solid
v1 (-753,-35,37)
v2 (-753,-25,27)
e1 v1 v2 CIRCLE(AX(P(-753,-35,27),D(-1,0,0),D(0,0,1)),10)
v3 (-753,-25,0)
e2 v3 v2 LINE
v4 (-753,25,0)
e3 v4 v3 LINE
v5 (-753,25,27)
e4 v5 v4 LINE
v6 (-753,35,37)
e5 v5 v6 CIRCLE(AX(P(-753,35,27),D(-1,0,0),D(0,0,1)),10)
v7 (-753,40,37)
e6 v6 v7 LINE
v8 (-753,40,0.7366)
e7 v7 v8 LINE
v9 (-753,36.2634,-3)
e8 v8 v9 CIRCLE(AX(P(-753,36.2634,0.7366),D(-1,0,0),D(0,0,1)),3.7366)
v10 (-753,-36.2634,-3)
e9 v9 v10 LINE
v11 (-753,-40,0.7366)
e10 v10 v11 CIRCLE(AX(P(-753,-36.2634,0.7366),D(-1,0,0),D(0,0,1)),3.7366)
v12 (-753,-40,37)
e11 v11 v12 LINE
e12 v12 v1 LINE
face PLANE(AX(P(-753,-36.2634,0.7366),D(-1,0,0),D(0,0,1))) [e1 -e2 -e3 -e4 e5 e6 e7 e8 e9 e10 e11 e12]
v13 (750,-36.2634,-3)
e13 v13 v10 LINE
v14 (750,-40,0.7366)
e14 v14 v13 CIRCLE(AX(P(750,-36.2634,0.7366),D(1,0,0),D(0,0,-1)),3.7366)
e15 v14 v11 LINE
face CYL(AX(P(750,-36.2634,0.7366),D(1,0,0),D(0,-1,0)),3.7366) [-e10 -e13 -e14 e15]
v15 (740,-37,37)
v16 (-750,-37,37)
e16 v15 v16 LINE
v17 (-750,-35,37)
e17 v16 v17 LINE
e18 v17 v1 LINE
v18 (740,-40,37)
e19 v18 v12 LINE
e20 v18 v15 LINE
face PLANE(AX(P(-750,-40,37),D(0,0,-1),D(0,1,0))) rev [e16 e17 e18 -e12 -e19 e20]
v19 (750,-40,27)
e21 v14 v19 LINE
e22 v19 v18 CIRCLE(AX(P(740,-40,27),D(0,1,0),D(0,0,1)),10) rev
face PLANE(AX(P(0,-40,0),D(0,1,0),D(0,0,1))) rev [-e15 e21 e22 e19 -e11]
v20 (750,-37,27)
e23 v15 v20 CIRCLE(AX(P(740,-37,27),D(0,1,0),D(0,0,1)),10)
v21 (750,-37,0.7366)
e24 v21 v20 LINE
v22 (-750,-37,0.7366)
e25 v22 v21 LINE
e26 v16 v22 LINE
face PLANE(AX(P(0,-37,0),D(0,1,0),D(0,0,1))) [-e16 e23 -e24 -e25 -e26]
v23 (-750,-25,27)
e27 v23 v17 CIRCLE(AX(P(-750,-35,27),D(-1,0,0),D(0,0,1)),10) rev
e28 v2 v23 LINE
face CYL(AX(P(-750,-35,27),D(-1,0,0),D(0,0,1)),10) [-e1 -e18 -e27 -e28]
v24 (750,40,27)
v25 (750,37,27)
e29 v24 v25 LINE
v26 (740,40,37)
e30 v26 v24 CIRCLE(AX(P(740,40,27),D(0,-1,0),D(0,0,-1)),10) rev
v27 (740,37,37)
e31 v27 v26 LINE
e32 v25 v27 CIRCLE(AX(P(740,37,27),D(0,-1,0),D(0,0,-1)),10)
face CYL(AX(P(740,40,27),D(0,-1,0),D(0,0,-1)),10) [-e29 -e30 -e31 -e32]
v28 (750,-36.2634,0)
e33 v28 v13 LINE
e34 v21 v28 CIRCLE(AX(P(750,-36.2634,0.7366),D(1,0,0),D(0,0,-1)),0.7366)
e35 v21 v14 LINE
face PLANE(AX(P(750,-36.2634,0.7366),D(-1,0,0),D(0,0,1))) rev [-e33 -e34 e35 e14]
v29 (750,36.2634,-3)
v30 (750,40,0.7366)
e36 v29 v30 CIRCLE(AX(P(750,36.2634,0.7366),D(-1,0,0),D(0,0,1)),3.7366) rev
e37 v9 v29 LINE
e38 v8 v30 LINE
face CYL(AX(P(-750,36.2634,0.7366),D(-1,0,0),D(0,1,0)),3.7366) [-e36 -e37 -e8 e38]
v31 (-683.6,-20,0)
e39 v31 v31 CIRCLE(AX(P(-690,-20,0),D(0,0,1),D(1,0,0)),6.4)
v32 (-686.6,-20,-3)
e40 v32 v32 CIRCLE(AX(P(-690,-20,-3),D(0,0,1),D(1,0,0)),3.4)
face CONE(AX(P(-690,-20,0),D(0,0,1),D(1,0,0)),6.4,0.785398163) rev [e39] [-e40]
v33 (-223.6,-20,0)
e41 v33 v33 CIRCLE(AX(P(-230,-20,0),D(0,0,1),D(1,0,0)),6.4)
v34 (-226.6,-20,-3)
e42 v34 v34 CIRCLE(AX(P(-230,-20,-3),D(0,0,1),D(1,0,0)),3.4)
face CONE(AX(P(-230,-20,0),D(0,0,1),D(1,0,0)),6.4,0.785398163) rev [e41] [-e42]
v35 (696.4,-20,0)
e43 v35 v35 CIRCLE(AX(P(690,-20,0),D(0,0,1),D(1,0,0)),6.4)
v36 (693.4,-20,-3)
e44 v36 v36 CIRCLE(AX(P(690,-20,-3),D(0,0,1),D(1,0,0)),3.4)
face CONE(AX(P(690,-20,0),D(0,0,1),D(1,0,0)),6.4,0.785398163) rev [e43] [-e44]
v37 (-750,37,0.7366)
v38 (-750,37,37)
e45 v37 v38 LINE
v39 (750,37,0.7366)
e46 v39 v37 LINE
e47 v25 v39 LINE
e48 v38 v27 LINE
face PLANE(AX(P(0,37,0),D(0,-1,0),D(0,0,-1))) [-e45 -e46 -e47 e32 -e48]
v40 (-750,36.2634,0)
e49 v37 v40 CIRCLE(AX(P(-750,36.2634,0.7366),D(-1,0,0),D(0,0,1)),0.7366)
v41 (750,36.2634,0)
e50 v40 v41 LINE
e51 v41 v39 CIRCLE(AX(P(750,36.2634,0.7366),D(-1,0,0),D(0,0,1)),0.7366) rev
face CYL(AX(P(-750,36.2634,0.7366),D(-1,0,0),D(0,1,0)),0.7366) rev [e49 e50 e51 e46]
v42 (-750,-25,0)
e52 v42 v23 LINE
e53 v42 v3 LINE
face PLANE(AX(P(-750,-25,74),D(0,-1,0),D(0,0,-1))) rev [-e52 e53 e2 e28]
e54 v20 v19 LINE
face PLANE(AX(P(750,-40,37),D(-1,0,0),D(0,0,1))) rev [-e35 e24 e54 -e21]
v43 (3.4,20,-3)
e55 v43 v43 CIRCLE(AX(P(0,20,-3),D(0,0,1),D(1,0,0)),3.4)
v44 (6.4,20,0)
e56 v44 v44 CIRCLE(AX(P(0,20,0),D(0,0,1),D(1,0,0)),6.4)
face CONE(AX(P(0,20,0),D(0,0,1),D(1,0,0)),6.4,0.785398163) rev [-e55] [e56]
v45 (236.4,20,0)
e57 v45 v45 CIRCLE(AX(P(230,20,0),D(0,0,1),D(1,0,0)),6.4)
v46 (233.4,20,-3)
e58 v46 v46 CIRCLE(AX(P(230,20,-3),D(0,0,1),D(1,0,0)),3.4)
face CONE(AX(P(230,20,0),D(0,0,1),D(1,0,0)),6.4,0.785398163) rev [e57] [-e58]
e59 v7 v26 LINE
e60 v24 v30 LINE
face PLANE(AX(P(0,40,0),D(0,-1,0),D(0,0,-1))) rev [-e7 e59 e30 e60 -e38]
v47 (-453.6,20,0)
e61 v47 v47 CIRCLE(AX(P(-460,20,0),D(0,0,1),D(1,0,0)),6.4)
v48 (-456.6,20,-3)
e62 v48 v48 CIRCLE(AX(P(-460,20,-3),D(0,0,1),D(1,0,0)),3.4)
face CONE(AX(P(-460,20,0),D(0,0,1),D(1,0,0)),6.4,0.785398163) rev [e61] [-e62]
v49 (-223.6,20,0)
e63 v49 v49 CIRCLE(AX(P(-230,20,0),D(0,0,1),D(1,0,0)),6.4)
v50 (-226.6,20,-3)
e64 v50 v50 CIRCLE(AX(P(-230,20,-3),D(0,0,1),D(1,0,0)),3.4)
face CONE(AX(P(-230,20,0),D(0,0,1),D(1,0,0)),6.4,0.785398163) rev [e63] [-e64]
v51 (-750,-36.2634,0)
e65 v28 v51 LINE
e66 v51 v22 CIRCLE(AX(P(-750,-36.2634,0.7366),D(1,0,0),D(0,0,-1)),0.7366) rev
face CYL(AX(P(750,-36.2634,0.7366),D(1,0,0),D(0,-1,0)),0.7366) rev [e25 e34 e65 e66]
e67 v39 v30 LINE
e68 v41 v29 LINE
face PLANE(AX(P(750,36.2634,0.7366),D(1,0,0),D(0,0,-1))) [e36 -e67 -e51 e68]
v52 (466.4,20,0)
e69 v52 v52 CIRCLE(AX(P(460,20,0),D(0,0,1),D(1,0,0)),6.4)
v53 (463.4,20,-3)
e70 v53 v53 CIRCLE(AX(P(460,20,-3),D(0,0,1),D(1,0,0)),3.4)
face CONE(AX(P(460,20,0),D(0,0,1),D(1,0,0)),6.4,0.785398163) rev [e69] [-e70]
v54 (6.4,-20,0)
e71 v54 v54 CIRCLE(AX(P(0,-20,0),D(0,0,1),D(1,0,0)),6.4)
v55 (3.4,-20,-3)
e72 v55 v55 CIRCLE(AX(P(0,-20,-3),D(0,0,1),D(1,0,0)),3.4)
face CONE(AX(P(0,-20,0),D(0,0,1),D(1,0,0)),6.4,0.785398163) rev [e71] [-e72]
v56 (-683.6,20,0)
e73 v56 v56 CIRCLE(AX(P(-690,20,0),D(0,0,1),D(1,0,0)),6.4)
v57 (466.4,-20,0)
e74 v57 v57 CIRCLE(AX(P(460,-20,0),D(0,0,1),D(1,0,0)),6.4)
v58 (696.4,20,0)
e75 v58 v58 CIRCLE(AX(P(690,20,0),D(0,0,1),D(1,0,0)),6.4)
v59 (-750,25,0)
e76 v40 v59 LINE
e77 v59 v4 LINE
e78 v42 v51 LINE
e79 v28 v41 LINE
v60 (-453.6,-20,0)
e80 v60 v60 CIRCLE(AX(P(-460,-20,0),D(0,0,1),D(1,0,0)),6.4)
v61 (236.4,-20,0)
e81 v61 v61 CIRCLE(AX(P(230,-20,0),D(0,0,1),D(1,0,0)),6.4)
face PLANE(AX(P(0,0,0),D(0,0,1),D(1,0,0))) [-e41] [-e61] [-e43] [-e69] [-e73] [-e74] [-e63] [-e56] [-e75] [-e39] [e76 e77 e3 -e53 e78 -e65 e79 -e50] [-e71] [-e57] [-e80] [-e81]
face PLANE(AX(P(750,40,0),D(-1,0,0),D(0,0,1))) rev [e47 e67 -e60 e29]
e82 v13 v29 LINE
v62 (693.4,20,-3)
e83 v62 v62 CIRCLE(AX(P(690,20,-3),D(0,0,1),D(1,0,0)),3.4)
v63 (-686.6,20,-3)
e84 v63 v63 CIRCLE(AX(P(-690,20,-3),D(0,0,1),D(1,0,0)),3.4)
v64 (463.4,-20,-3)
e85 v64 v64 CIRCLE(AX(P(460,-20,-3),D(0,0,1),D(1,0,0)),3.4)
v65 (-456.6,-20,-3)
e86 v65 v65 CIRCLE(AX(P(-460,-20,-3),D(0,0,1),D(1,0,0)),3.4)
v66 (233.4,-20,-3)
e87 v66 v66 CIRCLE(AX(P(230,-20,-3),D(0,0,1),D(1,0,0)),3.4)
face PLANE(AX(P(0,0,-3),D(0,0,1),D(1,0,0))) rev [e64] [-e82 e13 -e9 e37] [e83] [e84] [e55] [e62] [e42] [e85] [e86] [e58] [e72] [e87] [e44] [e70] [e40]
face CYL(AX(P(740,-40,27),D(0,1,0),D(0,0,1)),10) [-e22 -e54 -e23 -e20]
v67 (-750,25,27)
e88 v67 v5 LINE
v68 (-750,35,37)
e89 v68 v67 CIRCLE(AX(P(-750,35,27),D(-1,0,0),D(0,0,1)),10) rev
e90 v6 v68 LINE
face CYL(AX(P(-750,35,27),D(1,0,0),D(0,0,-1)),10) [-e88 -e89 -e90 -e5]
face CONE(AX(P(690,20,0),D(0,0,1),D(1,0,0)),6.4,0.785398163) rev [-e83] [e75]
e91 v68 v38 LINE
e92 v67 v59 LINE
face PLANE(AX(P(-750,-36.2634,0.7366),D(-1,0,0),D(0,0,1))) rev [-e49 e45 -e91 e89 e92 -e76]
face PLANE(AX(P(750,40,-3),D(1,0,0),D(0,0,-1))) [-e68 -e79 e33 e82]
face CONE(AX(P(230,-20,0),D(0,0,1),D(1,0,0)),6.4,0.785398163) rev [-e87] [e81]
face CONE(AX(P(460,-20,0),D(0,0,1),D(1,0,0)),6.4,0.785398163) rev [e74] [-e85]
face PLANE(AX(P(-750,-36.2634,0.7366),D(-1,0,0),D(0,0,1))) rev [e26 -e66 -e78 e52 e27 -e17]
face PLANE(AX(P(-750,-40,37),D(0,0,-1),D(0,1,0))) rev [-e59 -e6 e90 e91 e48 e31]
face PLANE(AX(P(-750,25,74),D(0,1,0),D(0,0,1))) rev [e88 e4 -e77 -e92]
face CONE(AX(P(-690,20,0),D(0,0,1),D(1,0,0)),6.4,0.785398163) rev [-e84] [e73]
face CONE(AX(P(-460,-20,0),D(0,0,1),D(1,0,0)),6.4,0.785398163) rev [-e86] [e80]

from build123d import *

# Parameters (mm, degrees)
SKETCH_1_W                         = 1500
SKETCH_1_H                         = 80
SM_BASE_FLANGE_1_DEPTH             = 3
SM_EDGE_FLANGE_1_STRIP_W           = 13.4732
SM_EDGE_FLANGE_1_STRIP_H           = 3
SM_EDGE_FLANGE_1_STRIP_CUT_DEPTH   = 1500
SM_EDGE_FLANGE_1_STRIP_2_W         = 13.4732
SM_EDGE_FLANGE_1_STRIP_2_H         = 3
SM_EDGE_FLANGE_1_STRIP_CUT_2_DEPTH = 1500
SM_EDGE_FLANGE_1_DEPTH             = 1500
SM_EDGE_FLANGE_1_BEND_DEPTH        = 1500
EXTRUDE_1_DEPTH                    = 3
SKETCH_13_W                        = 74
SKETCH_13_H                        = 50
CUT_EXTRUDE_3_DEPTH                = 3
FILLET_1_R                         = 10
HOLE_WIZARD_1_AT_2_COUNT           = 2
HOLE_WIZARD_1_AT_2_PITCH           = 40
PATTERN_LINEAR_1_COUNT             = 4
PATTERN_LINEAR_1_PITCH             = 230
PATTERN_LINEAR_1_COL_COUNT         = 4
PATTERN_LINEAR_1_COL_PITCH         = 230


# Sheet-metal steps are written as plain solids
with BuildPart() as part:
    # Sketch 1 → 基体-法兰1 (new body)
    with BuildSketch(Plane.XY):
        Rectangle(SKETCH_1_W, SKETCH_1_H)
    extrude(amount=-SM_BASE_FLANGE_1_DEPTH)

    # 边线-法兰1 strip (across the edge) → 边线-法兰1 strip cut (cut)
    with BuildSketch(Plane(origin=(-750, -40, 0), x_dir=(0, 1, 0), z_dir=(1, 0, 0))):
        with Locations((-3, -1.5)):
            Rectangle(SM_EDGE_FLANGE_1_STRIP_W, SM_EDGE_FLANGE_1_STRIP_H)
    extrude(amount=SM_EDGE_FLANGE_1_STRIP_CUT_DEPTH, mode=Mode.SUBTRACT)

    # 边线-法兰1 strip 2 (across the edge) → 边线-法兰1 strip cut 2 (cut)
    with BuildSketch(Plane(origin=(750, 40, 0), x_dir=(0, -1, 0), z_dir=(-1, 0, 0))):
        with Locations((-3, -1.5)):
            Rectangle(SM_EDGE_FLANGE_1_STRIP_2_W, SM_EDGE_FLANGE_1_STRIP_2_H)
    extrude(amount=SM_EDGE_FLANGE_1_STRIP_CUT_2_DEPTH, mode=Mode.SUBTRACT)

    # 边线-法兰1 section (across the edge) → 边线-法兰1 (add)
    with BuildSketch(Plane(origin=(-750, -40, 0), x_dir=(0, 1, 0), z_dir=(1, 0, 0))):
        with BuildLine():
            Line((0, 0.7366), (0, 37))
            Line((0, 37), (3, 37))
            Line((3, 37), (3, 0.7366))
            ThreePointArc((3, 0.7366), (3.215745145, 0.215745145), (3.7366, 0))
            Line((3.7366, 0), (3.7366, -3))
            ThreePointArc((3.7366, -3), (1.094424801, -1.905575199), (0, 0.7366))
        make_face()
    extrude(amount=SM_EDGE_FLANGE_1_DEPTH)

    # 边线-法兰1 section 2 (across the edge) → 边线-法兰1 bend (add)
    with BuildSketch(Plane(origin=(750, 40, 0), x_dir=(0, -1, 0), z_dir=(-1, 0, 0))):
        with BuildLine():
            Line((0, 0.7366), (0, 37))
            Line((0, 37), (3, 37))
            Line((3, 37), (3, 0.7366))
            ThreePointArc((3, 0.7366), (3.215745145, 0.215745145), (3.7366, 0))
            Line((3.7366, 0), (3.7366, -3))
            ThreePointArc((3.7366, -3), (1.094424801, -1.905575199), (0, 0.7366))
        make_face()
    extrude(amount=SM_EDGE_FLANGE_1_BEND_DEPTH)

    # 草图12 → 凸台-拉伸1 (add)
    with BuildSketch(Plane.ZY.offset(750)):
        with BuildLine():
            Line((37, -40), (0.7366, -40))
            ThreePointArc((0.7366, -40), (-1.905575199, -38.905575199), (-3, -36.2634))
            Line((-3, -36.2634), (-3, 36.2634))
            ThreePointArc((-3, 36.2634), (-1.905575199, 38.905575199), (0.7366, 40))
            Line((0.7366, 40), (37, 40))
            Line((37, 40), (37, -40))
        make_face()
    extrude(amount=EXTRUDE_1_DEPTH)

    # 草图13 → 切除-拉伸3 (cut)
    with BuildSketch(Plane.ZY.offset(753)):
        with Locations((37, 0)):
            Rectangle(SKETCH_13_W, SKETCH_13_H)
    extrude(amount=-CUT_EXTRUDE_3_DEPTH, mode=Mode.SUBTRACT)

    # 圆角1
    fillet_1_edges = [part.edges().sort_by_distance(p)[0] for p in [
        (-751.5, 25, 37),
        (-751.5, -25, 37),
        (750, -38.5, 37),
        (750, 38.5, 37),
    ]]
    fillet(fillet_1_edges, radius=FILLET_1_R)

    # 草图15 → 打孔尺寸(%根据)内六角花形沉头螺钉的类型1 (revolve, cut)
    with BuildSketch(Plane(origin=(0, 20, 0), x_dir=(0, -1, 0), z_dir=(1, 0, 0))):
        Polygon((0, 0), (0, 26.482840043), (3.3, 24.5), (3.3, 3.1), (6.4, 0), align=None)
    hole_wizard_1 = revolve(axis=Axis((0, 20, 6.35), (0, 0, -1)), mode=Mode.SUBTRACT)

    # 打孔尺寸(%根据)内六角花形沉头螺钉的类型1 at 2: 打孔尺寸(%根据)内六角花形沉头螺钉的类型1 ×2
    with Locations(*[(0, -i * HOLE_WIZARD_1_AT_2_PITCH, 0) for i in range(1, HOLE_WIZARD_1_AT_2_COUNT)]):
        add(hole_wizard_1, mode=Mode.SUBTRACT)

    # 阵列(线性)1: 打孔尺寸(%根据)内六角花形沉头螺钉的类型1 ×4
    with Locations(*[(-i * PATTERN_LINEAR_1_PITCH, 0, 0) for i in range(1, PATTERN_LINEAR_1_COUNT)]):
        add(hole_wizard_1, mode=Mode.SUBTRACT)

    # 阵列(线性)1 copy 1 sketch → 阵列(线性)1 copy 1 (revolve, cut)
    with BuildSketch(Plane(origin=(-230, -20, 0), x_dir=(0, -1, 0), z_dir=(1, 0, 0))):
        Polygon((0, 0), (0, 26.482840043), (3.3, 24.5), (3.3, 3.1), (6.4, 0), align=None)
    revolve(axis=Axis((-230, -20, 6.35), (0, 0, -1)), mode=Mode.SUBTRACT)

    # 阵列(线性)1 copy 2 sketch → 阵列(线性)1 copy 2 (revolve, cut)
    with BuildSketch(Plane(origin=(-460, -20, 0), x_dir=(0, -1, 0), z_dir=(1, 0, 0))):
        Polygon((0, 0), (0, 26.482840043), (3.3, 24.5), (3.3, 3.1), (6.4, 0), align=None)
    revolve(axis=Axis((-460, -20, 6.35), (0, 0, -1)), mode=Mode.SUBTRACT)

    # 阵列(线性)1 copy 3 sketch → 阵列(线性)1 copy 3 (revolve, cut)
    with BuildSketch(Plane(origin=(-690, -20, 0), x_dir=(0, -1, 0), z_dir=(1, 0, 0))):
        Polygon((0, 0), (0, 26.482840043), (3.3, 24.5), (3.3, 3.1), (6.4, 0), align=None)
    revolve(axis=Axis((-690, -20, 6.35), (0, 0, -1)), mode=Mode.SUBTRACT)

    # 阵列(线性)1 col: 打孔尺寸(%根据)内六角花形沉头螺钉的类型1 ×4
    with Locations(*[(i * PATTERN_LINEAR_1_COL_PITCH, 0, 0) for i in range(1, PATTERN_LINEAR_1_COL_COUNT)]):
        add(hole_wizard_1, mode=Mode.SUBTRACT)

    # 阵列(线性)1 col copy 1 sketch → 阵列(线性)1 col copy 1 (revolve, cut)
    with BuildSketch(Plane(origin=(230, -20, 0), x_dir=(0, -1, 0), z_dir=(1, 0, 0))):
        Polygon((0, 0), (0, 26.482840043), (3.3, 24.5), (3.3, 3.1), (6.4, 0), align=None)
    revolve(axis=Axis((230, -20, 6.35), (0, 0, -1)), mode=Mode.SUBTRACT)

    # 阵列(线性)1 col copy 2 sketch → 阵列(线性)1 col copy 2 (revolve, cut)
    with BuildSketch(Plane(origin=(460, -20, 0), x_dir=(0, -1, 0), z_dir=(1, 0, 0))):
        Polygon((0, 0), (0, 26.482840043), (3.3, 24.5), (3.3, 3.1), (6.4, 0), align=None)
    revolve(axis=Axis((460, -20, 6.35), (0, 0, -1)), mode=Mode.SUBTRACT)

    # 阵列(线性)1 col copy 3 sketch → 阵列(线性)1 col copy 3 (revolve, cut)
    with BuildSketch(Plane(origin=(690, -20, 0), x_dir=(0, -1, 0), z_dir=(1, 0, 0))):
        Polygon((0, 0), (0, 26.482840043), (3.3, 24.5), (3.3, 3.1), (6.4, 0), align=None)
    revolve(axis=Axis((690, -20, 6.35), (0, 0, -1)), mode=Mode.SUBTRACT)


solid = part.part
